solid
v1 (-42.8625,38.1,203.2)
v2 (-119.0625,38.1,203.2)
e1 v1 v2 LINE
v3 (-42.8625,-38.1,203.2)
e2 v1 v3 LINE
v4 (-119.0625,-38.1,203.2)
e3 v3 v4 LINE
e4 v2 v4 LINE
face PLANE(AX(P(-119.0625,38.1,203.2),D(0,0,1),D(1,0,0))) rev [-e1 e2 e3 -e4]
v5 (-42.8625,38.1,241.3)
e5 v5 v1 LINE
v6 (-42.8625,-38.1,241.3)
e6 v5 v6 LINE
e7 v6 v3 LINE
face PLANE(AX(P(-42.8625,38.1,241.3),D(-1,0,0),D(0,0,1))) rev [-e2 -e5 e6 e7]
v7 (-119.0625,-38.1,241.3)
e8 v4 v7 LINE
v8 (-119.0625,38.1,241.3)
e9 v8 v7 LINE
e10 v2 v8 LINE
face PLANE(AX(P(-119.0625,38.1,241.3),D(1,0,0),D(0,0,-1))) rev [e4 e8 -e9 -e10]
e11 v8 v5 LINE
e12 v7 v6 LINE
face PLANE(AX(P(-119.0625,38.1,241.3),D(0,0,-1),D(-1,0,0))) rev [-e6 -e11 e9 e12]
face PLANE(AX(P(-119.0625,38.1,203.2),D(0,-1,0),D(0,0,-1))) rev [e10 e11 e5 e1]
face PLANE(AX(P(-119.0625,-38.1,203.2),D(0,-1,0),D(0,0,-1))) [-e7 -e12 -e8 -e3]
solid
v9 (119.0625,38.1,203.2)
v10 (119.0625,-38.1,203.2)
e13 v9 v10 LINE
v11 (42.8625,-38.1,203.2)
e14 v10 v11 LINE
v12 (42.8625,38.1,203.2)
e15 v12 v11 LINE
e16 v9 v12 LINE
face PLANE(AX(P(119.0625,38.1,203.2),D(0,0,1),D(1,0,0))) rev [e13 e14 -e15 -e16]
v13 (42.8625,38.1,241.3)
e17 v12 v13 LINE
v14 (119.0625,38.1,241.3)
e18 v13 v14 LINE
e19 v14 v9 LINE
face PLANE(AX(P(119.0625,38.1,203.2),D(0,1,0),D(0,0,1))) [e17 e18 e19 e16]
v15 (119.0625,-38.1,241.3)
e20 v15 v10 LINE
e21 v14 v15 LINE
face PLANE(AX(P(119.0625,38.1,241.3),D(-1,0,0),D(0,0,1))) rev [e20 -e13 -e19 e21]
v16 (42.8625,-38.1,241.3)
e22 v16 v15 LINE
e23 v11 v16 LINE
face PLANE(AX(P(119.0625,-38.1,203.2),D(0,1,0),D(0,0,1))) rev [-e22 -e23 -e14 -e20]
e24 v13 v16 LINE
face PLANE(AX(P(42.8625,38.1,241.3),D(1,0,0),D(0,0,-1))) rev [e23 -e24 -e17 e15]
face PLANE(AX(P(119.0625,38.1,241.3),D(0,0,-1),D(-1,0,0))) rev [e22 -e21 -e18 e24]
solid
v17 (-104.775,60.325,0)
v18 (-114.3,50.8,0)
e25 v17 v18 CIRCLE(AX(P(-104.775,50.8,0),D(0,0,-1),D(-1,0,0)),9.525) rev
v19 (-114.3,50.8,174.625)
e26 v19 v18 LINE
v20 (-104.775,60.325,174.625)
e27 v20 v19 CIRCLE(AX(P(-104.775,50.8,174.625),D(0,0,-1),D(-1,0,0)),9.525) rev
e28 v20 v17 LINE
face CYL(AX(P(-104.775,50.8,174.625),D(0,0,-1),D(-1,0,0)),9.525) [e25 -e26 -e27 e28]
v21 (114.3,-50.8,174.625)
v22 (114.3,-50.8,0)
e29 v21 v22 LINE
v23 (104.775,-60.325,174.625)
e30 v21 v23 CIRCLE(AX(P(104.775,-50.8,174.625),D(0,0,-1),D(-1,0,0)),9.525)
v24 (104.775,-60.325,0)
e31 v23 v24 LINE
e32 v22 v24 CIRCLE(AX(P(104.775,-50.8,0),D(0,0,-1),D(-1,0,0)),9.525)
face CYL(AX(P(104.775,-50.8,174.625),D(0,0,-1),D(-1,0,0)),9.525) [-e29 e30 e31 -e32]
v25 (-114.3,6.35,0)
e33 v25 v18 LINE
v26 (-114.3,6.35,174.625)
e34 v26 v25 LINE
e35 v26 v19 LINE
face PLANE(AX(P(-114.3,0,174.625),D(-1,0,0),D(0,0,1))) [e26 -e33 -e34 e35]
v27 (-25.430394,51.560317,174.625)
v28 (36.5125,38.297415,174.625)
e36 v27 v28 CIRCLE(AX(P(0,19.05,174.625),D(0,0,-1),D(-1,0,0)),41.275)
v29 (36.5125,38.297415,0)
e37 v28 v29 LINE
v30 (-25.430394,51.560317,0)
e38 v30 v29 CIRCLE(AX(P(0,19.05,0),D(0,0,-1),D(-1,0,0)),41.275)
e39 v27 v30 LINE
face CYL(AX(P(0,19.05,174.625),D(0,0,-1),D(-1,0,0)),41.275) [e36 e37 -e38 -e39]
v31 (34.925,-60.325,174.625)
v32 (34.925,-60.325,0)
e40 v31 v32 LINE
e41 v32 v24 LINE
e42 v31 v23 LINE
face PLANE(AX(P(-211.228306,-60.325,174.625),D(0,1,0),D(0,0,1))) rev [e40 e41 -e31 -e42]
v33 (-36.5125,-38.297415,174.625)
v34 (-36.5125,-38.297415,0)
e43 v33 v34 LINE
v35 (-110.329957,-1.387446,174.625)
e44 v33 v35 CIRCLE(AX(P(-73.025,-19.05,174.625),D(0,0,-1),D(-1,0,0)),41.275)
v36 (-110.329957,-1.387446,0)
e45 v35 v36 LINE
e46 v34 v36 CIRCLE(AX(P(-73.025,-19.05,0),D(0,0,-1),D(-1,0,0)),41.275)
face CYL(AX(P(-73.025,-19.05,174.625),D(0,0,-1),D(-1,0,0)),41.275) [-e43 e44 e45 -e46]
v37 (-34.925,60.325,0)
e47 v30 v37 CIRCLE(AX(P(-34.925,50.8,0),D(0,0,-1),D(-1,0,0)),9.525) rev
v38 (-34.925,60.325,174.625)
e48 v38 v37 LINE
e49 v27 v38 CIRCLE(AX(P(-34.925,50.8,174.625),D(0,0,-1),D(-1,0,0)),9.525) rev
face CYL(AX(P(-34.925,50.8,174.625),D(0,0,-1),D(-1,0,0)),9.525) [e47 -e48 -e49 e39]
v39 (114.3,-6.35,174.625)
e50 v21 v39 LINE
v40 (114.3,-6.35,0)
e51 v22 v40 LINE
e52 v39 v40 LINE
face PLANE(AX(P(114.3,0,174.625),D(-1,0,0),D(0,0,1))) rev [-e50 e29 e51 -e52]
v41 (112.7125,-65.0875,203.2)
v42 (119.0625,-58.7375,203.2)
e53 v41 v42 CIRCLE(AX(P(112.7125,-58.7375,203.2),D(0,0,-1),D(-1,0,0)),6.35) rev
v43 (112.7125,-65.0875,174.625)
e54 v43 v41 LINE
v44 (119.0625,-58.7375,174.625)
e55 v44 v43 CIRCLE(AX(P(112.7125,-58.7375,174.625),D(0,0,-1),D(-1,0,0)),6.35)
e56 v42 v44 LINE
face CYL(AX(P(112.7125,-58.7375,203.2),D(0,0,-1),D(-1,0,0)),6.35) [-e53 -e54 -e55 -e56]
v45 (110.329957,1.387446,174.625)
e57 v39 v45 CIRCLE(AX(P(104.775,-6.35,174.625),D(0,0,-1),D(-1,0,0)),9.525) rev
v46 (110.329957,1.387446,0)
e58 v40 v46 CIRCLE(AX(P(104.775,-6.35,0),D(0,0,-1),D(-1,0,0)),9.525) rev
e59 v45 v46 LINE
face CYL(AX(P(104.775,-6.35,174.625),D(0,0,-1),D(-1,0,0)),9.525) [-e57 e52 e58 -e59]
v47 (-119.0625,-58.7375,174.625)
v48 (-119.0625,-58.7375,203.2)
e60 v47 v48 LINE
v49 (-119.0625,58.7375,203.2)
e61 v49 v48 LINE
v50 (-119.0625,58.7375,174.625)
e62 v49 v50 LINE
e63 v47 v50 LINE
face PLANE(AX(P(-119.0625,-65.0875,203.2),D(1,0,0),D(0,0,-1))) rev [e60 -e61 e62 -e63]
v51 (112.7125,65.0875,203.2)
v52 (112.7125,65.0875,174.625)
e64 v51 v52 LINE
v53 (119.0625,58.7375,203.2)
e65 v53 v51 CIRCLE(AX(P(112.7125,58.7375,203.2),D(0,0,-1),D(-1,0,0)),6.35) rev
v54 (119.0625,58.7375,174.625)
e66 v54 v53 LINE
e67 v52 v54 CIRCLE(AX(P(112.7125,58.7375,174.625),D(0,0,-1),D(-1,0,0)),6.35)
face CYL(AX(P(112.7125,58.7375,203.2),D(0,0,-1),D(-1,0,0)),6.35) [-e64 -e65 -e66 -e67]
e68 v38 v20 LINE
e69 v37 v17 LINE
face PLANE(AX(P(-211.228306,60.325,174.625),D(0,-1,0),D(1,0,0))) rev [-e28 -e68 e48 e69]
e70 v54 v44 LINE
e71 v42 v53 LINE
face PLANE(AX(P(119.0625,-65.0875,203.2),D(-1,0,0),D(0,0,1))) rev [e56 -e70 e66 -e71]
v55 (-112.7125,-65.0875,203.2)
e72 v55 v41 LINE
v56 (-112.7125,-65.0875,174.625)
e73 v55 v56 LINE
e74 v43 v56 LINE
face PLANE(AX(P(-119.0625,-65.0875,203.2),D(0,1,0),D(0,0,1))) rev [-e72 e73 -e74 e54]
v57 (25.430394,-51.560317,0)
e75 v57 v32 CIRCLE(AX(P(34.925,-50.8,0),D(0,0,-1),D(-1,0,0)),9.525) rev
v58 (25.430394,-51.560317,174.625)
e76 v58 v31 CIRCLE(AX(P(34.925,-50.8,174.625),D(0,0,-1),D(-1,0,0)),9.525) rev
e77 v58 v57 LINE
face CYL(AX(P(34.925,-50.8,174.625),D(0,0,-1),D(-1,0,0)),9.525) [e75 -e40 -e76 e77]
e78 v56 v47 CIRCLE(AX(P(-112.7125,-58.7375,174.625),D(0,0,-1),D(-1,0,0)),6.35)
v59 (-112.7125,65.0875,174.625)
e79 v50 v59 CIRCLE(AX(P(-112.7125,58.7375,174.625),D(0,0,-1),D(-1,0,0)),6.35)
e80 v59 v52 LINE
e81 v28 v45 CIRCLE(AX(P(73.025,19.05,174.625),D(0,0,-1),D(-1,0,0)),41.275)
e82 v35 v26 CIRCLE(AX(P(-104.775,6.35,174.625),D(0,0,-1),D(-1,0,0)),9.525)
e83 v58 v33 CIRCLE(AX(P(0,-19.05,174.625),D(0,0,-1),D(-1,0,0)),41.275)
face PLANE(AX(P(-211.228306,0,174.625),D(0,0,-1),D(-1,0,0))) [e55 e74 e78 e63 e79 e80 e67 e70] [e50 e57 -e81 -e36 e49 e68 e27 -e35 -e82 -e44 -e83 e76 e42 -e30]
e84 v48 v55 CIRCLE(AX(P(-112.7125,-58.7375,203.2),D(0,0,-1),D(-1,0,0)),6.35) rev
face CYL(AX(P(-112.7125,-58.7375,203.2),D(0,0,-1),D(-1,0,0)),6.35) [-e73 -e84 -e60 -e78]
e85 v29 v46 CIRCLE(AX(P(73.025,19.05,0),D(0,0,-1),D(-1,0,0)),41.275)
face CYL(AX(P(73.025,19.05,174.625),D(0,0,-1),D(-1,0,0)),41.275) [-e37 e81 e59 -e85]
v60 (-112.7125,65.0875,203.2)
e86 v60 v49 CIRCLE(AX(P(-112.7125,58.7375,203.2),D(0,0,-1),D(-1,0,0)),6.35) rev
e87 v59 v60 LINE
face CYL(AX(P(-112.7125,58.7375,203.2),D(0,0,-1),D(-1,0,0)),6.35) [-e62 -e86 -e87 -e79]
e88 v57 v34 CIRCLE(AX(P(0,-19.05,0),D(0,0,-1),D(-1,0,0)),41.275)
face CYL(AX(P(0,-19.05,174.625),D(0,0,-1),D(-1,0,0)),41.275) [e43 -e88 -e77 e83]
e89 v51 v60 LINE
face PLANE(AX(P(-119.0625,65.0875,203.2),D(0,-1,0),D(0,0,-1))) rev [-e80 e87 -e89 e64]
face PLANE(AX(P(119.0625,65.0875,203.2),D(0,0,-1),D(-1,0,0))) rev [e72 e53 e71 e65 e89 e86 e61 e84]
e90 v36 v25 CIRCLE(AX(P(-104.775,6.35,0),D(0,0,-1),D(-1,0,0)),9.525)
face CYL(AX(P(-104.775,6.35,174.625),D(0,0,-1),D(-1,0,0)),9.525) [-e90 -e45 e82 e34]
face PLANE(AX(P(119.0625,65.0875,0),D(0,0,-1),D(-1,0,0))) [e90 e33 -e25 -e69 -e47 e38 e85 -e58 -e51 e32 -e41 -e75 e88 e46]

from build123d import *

# Parameters (mm, degrees)
SKETCH1_W                    = 238.125
SKETCH1_H                    = 130.175
BOSS_EXTRUDE1_DEPTH          = 203.2
SKETCH2_W                    = 238.125
SKETCH2_H                    = 130.175
CUT_EXTRUDE1_DEPTH           = 174.625
FILLET1_R                    = 6.35
TERMINAL_START               = -38.1
TERMINAL_CLEARANCE_OUTLINE_W = 76.2
TERMINAL_CLEARANCE_OUTLINE_H = 38.1
TERMINAL_CLEARANCE_DEPTH     = 76.2


# Read off the part's stored shape, not the designer's step: Terminal clearance
with BuildPart() as part:
    # Sketch1 → Boss-Extrude1 (new body)
    with BuildSketch(Plane.XY):
        Rectangle(SKETCH1_W, SKETCH1_H)
    extrude(amount=BOSS_EXTRUDE1_DEPTH)

    # Sketch2 → Cut-Extrude1 (cut)
    with BuildSketch(Plane(origin=(0, 0, 0), x_dir=(-1, 0, 0), z_dir=(0, 0, -1))):
        Rectangle(SKETCH2_W, SKETCH2_H)
        with BuildLine():
            ThreePointArc((114.3, -19.05), (82.938934322, -59.116688549), (36.5125, -38.297414599))
            ThreePointArc((36.5125, -38.297414599), (8.641725006, -59.410205821), (-25.430393972, -51.56031663))
            ThreePointArc((-25.430393972, -51.56031663), (-28.464210223, -57.798844223), (-34.925, -60.325))
            Line((-34.925, -60.325), (-104.775, -60.325))
            ThreePointArc((-104.775, -60.325), (-111.510192091, -57.535192091), (-114.3, -50.8))
            Line((-114.3, -50.8), (-114.3, -6.35))
            ThreePointArc((-114.3, -6.35), (-113.249567583, -2.001744111), (-110.329957107, 1.387446384))
            ThreePointArc((-110.329957107, 1.387446384), (-91.484237132, 55.967234316), (-36.5125, 38.297414599))
            ThreePointArc((-36.5125, 38.297414599), (-8.641725006, 59.410205821), (25.430393972, 51.56031663))
            ThreePointArc((25.430393972, 51.56031663), (28.464210223, 57.798844223), (34.925, 60.325))
            Line((34.925, 60.325), (104.775, 60.325))
            ThreePointArc((104.775, 60.325), (111.510192091, 57.535192091), (114.3, 50.8))
            Line((114.3, 50.8), (114.3, 6.35))
            ThreePointArc((114.3, 6.35), (113.249567583, 2.001744111), (110.329957107, -1.387446384))
            ThreePointArc((110.329957107, -1.387446384), (113.295260302, -9.998383558), (114.3, -19.05))
        make_face(mode=Mode.SUBTRACT)
    extrude(amount=-CUT_EXTRUDE1_DEPTH, mode=Mode.SUBTRACT)

    # Fillet1
    fillet1_edges = [part.edges().sort_by_distance(p)[0] for p in [
        (119.0625, -65.0875, 188.9125),
        (-119.0625, -65.0875, 188.9125),
        (-119.0625, 65.0875, 188.9125),
        (119.0625, 65.0875, 188.9125),
    ]]
    fillet(fillet1_edges, radius=FILLET1_R)


with BuildPart() as body_2:
    # Terminal clearance outline → Terminal clearance (new body)
    with BuildSketch(Plane(origin=(0, 0, 0), x_dir=(1, 0, 0), z_dir=(0, 1, 0)).offset(TERMINAL_START)):
        with Locations((-80.9625, -222.25)):
            Rectangle(TERMINAL_CLEARANCE_OUTLINE_W, TERMINAL_CLEARANCE_OUTLINE_H)
        with Locations((80.9625, -222.25)):
            Rectangle(TERMINAL_CLEARANCE_OUTLINE_W, TERMINAL_CLEARANCE_OUTLINE_H)
    extrude(amount=TERMINAL_CLEARANCE_DEPTH)


solid = Compound([part.part, body_2.part])
